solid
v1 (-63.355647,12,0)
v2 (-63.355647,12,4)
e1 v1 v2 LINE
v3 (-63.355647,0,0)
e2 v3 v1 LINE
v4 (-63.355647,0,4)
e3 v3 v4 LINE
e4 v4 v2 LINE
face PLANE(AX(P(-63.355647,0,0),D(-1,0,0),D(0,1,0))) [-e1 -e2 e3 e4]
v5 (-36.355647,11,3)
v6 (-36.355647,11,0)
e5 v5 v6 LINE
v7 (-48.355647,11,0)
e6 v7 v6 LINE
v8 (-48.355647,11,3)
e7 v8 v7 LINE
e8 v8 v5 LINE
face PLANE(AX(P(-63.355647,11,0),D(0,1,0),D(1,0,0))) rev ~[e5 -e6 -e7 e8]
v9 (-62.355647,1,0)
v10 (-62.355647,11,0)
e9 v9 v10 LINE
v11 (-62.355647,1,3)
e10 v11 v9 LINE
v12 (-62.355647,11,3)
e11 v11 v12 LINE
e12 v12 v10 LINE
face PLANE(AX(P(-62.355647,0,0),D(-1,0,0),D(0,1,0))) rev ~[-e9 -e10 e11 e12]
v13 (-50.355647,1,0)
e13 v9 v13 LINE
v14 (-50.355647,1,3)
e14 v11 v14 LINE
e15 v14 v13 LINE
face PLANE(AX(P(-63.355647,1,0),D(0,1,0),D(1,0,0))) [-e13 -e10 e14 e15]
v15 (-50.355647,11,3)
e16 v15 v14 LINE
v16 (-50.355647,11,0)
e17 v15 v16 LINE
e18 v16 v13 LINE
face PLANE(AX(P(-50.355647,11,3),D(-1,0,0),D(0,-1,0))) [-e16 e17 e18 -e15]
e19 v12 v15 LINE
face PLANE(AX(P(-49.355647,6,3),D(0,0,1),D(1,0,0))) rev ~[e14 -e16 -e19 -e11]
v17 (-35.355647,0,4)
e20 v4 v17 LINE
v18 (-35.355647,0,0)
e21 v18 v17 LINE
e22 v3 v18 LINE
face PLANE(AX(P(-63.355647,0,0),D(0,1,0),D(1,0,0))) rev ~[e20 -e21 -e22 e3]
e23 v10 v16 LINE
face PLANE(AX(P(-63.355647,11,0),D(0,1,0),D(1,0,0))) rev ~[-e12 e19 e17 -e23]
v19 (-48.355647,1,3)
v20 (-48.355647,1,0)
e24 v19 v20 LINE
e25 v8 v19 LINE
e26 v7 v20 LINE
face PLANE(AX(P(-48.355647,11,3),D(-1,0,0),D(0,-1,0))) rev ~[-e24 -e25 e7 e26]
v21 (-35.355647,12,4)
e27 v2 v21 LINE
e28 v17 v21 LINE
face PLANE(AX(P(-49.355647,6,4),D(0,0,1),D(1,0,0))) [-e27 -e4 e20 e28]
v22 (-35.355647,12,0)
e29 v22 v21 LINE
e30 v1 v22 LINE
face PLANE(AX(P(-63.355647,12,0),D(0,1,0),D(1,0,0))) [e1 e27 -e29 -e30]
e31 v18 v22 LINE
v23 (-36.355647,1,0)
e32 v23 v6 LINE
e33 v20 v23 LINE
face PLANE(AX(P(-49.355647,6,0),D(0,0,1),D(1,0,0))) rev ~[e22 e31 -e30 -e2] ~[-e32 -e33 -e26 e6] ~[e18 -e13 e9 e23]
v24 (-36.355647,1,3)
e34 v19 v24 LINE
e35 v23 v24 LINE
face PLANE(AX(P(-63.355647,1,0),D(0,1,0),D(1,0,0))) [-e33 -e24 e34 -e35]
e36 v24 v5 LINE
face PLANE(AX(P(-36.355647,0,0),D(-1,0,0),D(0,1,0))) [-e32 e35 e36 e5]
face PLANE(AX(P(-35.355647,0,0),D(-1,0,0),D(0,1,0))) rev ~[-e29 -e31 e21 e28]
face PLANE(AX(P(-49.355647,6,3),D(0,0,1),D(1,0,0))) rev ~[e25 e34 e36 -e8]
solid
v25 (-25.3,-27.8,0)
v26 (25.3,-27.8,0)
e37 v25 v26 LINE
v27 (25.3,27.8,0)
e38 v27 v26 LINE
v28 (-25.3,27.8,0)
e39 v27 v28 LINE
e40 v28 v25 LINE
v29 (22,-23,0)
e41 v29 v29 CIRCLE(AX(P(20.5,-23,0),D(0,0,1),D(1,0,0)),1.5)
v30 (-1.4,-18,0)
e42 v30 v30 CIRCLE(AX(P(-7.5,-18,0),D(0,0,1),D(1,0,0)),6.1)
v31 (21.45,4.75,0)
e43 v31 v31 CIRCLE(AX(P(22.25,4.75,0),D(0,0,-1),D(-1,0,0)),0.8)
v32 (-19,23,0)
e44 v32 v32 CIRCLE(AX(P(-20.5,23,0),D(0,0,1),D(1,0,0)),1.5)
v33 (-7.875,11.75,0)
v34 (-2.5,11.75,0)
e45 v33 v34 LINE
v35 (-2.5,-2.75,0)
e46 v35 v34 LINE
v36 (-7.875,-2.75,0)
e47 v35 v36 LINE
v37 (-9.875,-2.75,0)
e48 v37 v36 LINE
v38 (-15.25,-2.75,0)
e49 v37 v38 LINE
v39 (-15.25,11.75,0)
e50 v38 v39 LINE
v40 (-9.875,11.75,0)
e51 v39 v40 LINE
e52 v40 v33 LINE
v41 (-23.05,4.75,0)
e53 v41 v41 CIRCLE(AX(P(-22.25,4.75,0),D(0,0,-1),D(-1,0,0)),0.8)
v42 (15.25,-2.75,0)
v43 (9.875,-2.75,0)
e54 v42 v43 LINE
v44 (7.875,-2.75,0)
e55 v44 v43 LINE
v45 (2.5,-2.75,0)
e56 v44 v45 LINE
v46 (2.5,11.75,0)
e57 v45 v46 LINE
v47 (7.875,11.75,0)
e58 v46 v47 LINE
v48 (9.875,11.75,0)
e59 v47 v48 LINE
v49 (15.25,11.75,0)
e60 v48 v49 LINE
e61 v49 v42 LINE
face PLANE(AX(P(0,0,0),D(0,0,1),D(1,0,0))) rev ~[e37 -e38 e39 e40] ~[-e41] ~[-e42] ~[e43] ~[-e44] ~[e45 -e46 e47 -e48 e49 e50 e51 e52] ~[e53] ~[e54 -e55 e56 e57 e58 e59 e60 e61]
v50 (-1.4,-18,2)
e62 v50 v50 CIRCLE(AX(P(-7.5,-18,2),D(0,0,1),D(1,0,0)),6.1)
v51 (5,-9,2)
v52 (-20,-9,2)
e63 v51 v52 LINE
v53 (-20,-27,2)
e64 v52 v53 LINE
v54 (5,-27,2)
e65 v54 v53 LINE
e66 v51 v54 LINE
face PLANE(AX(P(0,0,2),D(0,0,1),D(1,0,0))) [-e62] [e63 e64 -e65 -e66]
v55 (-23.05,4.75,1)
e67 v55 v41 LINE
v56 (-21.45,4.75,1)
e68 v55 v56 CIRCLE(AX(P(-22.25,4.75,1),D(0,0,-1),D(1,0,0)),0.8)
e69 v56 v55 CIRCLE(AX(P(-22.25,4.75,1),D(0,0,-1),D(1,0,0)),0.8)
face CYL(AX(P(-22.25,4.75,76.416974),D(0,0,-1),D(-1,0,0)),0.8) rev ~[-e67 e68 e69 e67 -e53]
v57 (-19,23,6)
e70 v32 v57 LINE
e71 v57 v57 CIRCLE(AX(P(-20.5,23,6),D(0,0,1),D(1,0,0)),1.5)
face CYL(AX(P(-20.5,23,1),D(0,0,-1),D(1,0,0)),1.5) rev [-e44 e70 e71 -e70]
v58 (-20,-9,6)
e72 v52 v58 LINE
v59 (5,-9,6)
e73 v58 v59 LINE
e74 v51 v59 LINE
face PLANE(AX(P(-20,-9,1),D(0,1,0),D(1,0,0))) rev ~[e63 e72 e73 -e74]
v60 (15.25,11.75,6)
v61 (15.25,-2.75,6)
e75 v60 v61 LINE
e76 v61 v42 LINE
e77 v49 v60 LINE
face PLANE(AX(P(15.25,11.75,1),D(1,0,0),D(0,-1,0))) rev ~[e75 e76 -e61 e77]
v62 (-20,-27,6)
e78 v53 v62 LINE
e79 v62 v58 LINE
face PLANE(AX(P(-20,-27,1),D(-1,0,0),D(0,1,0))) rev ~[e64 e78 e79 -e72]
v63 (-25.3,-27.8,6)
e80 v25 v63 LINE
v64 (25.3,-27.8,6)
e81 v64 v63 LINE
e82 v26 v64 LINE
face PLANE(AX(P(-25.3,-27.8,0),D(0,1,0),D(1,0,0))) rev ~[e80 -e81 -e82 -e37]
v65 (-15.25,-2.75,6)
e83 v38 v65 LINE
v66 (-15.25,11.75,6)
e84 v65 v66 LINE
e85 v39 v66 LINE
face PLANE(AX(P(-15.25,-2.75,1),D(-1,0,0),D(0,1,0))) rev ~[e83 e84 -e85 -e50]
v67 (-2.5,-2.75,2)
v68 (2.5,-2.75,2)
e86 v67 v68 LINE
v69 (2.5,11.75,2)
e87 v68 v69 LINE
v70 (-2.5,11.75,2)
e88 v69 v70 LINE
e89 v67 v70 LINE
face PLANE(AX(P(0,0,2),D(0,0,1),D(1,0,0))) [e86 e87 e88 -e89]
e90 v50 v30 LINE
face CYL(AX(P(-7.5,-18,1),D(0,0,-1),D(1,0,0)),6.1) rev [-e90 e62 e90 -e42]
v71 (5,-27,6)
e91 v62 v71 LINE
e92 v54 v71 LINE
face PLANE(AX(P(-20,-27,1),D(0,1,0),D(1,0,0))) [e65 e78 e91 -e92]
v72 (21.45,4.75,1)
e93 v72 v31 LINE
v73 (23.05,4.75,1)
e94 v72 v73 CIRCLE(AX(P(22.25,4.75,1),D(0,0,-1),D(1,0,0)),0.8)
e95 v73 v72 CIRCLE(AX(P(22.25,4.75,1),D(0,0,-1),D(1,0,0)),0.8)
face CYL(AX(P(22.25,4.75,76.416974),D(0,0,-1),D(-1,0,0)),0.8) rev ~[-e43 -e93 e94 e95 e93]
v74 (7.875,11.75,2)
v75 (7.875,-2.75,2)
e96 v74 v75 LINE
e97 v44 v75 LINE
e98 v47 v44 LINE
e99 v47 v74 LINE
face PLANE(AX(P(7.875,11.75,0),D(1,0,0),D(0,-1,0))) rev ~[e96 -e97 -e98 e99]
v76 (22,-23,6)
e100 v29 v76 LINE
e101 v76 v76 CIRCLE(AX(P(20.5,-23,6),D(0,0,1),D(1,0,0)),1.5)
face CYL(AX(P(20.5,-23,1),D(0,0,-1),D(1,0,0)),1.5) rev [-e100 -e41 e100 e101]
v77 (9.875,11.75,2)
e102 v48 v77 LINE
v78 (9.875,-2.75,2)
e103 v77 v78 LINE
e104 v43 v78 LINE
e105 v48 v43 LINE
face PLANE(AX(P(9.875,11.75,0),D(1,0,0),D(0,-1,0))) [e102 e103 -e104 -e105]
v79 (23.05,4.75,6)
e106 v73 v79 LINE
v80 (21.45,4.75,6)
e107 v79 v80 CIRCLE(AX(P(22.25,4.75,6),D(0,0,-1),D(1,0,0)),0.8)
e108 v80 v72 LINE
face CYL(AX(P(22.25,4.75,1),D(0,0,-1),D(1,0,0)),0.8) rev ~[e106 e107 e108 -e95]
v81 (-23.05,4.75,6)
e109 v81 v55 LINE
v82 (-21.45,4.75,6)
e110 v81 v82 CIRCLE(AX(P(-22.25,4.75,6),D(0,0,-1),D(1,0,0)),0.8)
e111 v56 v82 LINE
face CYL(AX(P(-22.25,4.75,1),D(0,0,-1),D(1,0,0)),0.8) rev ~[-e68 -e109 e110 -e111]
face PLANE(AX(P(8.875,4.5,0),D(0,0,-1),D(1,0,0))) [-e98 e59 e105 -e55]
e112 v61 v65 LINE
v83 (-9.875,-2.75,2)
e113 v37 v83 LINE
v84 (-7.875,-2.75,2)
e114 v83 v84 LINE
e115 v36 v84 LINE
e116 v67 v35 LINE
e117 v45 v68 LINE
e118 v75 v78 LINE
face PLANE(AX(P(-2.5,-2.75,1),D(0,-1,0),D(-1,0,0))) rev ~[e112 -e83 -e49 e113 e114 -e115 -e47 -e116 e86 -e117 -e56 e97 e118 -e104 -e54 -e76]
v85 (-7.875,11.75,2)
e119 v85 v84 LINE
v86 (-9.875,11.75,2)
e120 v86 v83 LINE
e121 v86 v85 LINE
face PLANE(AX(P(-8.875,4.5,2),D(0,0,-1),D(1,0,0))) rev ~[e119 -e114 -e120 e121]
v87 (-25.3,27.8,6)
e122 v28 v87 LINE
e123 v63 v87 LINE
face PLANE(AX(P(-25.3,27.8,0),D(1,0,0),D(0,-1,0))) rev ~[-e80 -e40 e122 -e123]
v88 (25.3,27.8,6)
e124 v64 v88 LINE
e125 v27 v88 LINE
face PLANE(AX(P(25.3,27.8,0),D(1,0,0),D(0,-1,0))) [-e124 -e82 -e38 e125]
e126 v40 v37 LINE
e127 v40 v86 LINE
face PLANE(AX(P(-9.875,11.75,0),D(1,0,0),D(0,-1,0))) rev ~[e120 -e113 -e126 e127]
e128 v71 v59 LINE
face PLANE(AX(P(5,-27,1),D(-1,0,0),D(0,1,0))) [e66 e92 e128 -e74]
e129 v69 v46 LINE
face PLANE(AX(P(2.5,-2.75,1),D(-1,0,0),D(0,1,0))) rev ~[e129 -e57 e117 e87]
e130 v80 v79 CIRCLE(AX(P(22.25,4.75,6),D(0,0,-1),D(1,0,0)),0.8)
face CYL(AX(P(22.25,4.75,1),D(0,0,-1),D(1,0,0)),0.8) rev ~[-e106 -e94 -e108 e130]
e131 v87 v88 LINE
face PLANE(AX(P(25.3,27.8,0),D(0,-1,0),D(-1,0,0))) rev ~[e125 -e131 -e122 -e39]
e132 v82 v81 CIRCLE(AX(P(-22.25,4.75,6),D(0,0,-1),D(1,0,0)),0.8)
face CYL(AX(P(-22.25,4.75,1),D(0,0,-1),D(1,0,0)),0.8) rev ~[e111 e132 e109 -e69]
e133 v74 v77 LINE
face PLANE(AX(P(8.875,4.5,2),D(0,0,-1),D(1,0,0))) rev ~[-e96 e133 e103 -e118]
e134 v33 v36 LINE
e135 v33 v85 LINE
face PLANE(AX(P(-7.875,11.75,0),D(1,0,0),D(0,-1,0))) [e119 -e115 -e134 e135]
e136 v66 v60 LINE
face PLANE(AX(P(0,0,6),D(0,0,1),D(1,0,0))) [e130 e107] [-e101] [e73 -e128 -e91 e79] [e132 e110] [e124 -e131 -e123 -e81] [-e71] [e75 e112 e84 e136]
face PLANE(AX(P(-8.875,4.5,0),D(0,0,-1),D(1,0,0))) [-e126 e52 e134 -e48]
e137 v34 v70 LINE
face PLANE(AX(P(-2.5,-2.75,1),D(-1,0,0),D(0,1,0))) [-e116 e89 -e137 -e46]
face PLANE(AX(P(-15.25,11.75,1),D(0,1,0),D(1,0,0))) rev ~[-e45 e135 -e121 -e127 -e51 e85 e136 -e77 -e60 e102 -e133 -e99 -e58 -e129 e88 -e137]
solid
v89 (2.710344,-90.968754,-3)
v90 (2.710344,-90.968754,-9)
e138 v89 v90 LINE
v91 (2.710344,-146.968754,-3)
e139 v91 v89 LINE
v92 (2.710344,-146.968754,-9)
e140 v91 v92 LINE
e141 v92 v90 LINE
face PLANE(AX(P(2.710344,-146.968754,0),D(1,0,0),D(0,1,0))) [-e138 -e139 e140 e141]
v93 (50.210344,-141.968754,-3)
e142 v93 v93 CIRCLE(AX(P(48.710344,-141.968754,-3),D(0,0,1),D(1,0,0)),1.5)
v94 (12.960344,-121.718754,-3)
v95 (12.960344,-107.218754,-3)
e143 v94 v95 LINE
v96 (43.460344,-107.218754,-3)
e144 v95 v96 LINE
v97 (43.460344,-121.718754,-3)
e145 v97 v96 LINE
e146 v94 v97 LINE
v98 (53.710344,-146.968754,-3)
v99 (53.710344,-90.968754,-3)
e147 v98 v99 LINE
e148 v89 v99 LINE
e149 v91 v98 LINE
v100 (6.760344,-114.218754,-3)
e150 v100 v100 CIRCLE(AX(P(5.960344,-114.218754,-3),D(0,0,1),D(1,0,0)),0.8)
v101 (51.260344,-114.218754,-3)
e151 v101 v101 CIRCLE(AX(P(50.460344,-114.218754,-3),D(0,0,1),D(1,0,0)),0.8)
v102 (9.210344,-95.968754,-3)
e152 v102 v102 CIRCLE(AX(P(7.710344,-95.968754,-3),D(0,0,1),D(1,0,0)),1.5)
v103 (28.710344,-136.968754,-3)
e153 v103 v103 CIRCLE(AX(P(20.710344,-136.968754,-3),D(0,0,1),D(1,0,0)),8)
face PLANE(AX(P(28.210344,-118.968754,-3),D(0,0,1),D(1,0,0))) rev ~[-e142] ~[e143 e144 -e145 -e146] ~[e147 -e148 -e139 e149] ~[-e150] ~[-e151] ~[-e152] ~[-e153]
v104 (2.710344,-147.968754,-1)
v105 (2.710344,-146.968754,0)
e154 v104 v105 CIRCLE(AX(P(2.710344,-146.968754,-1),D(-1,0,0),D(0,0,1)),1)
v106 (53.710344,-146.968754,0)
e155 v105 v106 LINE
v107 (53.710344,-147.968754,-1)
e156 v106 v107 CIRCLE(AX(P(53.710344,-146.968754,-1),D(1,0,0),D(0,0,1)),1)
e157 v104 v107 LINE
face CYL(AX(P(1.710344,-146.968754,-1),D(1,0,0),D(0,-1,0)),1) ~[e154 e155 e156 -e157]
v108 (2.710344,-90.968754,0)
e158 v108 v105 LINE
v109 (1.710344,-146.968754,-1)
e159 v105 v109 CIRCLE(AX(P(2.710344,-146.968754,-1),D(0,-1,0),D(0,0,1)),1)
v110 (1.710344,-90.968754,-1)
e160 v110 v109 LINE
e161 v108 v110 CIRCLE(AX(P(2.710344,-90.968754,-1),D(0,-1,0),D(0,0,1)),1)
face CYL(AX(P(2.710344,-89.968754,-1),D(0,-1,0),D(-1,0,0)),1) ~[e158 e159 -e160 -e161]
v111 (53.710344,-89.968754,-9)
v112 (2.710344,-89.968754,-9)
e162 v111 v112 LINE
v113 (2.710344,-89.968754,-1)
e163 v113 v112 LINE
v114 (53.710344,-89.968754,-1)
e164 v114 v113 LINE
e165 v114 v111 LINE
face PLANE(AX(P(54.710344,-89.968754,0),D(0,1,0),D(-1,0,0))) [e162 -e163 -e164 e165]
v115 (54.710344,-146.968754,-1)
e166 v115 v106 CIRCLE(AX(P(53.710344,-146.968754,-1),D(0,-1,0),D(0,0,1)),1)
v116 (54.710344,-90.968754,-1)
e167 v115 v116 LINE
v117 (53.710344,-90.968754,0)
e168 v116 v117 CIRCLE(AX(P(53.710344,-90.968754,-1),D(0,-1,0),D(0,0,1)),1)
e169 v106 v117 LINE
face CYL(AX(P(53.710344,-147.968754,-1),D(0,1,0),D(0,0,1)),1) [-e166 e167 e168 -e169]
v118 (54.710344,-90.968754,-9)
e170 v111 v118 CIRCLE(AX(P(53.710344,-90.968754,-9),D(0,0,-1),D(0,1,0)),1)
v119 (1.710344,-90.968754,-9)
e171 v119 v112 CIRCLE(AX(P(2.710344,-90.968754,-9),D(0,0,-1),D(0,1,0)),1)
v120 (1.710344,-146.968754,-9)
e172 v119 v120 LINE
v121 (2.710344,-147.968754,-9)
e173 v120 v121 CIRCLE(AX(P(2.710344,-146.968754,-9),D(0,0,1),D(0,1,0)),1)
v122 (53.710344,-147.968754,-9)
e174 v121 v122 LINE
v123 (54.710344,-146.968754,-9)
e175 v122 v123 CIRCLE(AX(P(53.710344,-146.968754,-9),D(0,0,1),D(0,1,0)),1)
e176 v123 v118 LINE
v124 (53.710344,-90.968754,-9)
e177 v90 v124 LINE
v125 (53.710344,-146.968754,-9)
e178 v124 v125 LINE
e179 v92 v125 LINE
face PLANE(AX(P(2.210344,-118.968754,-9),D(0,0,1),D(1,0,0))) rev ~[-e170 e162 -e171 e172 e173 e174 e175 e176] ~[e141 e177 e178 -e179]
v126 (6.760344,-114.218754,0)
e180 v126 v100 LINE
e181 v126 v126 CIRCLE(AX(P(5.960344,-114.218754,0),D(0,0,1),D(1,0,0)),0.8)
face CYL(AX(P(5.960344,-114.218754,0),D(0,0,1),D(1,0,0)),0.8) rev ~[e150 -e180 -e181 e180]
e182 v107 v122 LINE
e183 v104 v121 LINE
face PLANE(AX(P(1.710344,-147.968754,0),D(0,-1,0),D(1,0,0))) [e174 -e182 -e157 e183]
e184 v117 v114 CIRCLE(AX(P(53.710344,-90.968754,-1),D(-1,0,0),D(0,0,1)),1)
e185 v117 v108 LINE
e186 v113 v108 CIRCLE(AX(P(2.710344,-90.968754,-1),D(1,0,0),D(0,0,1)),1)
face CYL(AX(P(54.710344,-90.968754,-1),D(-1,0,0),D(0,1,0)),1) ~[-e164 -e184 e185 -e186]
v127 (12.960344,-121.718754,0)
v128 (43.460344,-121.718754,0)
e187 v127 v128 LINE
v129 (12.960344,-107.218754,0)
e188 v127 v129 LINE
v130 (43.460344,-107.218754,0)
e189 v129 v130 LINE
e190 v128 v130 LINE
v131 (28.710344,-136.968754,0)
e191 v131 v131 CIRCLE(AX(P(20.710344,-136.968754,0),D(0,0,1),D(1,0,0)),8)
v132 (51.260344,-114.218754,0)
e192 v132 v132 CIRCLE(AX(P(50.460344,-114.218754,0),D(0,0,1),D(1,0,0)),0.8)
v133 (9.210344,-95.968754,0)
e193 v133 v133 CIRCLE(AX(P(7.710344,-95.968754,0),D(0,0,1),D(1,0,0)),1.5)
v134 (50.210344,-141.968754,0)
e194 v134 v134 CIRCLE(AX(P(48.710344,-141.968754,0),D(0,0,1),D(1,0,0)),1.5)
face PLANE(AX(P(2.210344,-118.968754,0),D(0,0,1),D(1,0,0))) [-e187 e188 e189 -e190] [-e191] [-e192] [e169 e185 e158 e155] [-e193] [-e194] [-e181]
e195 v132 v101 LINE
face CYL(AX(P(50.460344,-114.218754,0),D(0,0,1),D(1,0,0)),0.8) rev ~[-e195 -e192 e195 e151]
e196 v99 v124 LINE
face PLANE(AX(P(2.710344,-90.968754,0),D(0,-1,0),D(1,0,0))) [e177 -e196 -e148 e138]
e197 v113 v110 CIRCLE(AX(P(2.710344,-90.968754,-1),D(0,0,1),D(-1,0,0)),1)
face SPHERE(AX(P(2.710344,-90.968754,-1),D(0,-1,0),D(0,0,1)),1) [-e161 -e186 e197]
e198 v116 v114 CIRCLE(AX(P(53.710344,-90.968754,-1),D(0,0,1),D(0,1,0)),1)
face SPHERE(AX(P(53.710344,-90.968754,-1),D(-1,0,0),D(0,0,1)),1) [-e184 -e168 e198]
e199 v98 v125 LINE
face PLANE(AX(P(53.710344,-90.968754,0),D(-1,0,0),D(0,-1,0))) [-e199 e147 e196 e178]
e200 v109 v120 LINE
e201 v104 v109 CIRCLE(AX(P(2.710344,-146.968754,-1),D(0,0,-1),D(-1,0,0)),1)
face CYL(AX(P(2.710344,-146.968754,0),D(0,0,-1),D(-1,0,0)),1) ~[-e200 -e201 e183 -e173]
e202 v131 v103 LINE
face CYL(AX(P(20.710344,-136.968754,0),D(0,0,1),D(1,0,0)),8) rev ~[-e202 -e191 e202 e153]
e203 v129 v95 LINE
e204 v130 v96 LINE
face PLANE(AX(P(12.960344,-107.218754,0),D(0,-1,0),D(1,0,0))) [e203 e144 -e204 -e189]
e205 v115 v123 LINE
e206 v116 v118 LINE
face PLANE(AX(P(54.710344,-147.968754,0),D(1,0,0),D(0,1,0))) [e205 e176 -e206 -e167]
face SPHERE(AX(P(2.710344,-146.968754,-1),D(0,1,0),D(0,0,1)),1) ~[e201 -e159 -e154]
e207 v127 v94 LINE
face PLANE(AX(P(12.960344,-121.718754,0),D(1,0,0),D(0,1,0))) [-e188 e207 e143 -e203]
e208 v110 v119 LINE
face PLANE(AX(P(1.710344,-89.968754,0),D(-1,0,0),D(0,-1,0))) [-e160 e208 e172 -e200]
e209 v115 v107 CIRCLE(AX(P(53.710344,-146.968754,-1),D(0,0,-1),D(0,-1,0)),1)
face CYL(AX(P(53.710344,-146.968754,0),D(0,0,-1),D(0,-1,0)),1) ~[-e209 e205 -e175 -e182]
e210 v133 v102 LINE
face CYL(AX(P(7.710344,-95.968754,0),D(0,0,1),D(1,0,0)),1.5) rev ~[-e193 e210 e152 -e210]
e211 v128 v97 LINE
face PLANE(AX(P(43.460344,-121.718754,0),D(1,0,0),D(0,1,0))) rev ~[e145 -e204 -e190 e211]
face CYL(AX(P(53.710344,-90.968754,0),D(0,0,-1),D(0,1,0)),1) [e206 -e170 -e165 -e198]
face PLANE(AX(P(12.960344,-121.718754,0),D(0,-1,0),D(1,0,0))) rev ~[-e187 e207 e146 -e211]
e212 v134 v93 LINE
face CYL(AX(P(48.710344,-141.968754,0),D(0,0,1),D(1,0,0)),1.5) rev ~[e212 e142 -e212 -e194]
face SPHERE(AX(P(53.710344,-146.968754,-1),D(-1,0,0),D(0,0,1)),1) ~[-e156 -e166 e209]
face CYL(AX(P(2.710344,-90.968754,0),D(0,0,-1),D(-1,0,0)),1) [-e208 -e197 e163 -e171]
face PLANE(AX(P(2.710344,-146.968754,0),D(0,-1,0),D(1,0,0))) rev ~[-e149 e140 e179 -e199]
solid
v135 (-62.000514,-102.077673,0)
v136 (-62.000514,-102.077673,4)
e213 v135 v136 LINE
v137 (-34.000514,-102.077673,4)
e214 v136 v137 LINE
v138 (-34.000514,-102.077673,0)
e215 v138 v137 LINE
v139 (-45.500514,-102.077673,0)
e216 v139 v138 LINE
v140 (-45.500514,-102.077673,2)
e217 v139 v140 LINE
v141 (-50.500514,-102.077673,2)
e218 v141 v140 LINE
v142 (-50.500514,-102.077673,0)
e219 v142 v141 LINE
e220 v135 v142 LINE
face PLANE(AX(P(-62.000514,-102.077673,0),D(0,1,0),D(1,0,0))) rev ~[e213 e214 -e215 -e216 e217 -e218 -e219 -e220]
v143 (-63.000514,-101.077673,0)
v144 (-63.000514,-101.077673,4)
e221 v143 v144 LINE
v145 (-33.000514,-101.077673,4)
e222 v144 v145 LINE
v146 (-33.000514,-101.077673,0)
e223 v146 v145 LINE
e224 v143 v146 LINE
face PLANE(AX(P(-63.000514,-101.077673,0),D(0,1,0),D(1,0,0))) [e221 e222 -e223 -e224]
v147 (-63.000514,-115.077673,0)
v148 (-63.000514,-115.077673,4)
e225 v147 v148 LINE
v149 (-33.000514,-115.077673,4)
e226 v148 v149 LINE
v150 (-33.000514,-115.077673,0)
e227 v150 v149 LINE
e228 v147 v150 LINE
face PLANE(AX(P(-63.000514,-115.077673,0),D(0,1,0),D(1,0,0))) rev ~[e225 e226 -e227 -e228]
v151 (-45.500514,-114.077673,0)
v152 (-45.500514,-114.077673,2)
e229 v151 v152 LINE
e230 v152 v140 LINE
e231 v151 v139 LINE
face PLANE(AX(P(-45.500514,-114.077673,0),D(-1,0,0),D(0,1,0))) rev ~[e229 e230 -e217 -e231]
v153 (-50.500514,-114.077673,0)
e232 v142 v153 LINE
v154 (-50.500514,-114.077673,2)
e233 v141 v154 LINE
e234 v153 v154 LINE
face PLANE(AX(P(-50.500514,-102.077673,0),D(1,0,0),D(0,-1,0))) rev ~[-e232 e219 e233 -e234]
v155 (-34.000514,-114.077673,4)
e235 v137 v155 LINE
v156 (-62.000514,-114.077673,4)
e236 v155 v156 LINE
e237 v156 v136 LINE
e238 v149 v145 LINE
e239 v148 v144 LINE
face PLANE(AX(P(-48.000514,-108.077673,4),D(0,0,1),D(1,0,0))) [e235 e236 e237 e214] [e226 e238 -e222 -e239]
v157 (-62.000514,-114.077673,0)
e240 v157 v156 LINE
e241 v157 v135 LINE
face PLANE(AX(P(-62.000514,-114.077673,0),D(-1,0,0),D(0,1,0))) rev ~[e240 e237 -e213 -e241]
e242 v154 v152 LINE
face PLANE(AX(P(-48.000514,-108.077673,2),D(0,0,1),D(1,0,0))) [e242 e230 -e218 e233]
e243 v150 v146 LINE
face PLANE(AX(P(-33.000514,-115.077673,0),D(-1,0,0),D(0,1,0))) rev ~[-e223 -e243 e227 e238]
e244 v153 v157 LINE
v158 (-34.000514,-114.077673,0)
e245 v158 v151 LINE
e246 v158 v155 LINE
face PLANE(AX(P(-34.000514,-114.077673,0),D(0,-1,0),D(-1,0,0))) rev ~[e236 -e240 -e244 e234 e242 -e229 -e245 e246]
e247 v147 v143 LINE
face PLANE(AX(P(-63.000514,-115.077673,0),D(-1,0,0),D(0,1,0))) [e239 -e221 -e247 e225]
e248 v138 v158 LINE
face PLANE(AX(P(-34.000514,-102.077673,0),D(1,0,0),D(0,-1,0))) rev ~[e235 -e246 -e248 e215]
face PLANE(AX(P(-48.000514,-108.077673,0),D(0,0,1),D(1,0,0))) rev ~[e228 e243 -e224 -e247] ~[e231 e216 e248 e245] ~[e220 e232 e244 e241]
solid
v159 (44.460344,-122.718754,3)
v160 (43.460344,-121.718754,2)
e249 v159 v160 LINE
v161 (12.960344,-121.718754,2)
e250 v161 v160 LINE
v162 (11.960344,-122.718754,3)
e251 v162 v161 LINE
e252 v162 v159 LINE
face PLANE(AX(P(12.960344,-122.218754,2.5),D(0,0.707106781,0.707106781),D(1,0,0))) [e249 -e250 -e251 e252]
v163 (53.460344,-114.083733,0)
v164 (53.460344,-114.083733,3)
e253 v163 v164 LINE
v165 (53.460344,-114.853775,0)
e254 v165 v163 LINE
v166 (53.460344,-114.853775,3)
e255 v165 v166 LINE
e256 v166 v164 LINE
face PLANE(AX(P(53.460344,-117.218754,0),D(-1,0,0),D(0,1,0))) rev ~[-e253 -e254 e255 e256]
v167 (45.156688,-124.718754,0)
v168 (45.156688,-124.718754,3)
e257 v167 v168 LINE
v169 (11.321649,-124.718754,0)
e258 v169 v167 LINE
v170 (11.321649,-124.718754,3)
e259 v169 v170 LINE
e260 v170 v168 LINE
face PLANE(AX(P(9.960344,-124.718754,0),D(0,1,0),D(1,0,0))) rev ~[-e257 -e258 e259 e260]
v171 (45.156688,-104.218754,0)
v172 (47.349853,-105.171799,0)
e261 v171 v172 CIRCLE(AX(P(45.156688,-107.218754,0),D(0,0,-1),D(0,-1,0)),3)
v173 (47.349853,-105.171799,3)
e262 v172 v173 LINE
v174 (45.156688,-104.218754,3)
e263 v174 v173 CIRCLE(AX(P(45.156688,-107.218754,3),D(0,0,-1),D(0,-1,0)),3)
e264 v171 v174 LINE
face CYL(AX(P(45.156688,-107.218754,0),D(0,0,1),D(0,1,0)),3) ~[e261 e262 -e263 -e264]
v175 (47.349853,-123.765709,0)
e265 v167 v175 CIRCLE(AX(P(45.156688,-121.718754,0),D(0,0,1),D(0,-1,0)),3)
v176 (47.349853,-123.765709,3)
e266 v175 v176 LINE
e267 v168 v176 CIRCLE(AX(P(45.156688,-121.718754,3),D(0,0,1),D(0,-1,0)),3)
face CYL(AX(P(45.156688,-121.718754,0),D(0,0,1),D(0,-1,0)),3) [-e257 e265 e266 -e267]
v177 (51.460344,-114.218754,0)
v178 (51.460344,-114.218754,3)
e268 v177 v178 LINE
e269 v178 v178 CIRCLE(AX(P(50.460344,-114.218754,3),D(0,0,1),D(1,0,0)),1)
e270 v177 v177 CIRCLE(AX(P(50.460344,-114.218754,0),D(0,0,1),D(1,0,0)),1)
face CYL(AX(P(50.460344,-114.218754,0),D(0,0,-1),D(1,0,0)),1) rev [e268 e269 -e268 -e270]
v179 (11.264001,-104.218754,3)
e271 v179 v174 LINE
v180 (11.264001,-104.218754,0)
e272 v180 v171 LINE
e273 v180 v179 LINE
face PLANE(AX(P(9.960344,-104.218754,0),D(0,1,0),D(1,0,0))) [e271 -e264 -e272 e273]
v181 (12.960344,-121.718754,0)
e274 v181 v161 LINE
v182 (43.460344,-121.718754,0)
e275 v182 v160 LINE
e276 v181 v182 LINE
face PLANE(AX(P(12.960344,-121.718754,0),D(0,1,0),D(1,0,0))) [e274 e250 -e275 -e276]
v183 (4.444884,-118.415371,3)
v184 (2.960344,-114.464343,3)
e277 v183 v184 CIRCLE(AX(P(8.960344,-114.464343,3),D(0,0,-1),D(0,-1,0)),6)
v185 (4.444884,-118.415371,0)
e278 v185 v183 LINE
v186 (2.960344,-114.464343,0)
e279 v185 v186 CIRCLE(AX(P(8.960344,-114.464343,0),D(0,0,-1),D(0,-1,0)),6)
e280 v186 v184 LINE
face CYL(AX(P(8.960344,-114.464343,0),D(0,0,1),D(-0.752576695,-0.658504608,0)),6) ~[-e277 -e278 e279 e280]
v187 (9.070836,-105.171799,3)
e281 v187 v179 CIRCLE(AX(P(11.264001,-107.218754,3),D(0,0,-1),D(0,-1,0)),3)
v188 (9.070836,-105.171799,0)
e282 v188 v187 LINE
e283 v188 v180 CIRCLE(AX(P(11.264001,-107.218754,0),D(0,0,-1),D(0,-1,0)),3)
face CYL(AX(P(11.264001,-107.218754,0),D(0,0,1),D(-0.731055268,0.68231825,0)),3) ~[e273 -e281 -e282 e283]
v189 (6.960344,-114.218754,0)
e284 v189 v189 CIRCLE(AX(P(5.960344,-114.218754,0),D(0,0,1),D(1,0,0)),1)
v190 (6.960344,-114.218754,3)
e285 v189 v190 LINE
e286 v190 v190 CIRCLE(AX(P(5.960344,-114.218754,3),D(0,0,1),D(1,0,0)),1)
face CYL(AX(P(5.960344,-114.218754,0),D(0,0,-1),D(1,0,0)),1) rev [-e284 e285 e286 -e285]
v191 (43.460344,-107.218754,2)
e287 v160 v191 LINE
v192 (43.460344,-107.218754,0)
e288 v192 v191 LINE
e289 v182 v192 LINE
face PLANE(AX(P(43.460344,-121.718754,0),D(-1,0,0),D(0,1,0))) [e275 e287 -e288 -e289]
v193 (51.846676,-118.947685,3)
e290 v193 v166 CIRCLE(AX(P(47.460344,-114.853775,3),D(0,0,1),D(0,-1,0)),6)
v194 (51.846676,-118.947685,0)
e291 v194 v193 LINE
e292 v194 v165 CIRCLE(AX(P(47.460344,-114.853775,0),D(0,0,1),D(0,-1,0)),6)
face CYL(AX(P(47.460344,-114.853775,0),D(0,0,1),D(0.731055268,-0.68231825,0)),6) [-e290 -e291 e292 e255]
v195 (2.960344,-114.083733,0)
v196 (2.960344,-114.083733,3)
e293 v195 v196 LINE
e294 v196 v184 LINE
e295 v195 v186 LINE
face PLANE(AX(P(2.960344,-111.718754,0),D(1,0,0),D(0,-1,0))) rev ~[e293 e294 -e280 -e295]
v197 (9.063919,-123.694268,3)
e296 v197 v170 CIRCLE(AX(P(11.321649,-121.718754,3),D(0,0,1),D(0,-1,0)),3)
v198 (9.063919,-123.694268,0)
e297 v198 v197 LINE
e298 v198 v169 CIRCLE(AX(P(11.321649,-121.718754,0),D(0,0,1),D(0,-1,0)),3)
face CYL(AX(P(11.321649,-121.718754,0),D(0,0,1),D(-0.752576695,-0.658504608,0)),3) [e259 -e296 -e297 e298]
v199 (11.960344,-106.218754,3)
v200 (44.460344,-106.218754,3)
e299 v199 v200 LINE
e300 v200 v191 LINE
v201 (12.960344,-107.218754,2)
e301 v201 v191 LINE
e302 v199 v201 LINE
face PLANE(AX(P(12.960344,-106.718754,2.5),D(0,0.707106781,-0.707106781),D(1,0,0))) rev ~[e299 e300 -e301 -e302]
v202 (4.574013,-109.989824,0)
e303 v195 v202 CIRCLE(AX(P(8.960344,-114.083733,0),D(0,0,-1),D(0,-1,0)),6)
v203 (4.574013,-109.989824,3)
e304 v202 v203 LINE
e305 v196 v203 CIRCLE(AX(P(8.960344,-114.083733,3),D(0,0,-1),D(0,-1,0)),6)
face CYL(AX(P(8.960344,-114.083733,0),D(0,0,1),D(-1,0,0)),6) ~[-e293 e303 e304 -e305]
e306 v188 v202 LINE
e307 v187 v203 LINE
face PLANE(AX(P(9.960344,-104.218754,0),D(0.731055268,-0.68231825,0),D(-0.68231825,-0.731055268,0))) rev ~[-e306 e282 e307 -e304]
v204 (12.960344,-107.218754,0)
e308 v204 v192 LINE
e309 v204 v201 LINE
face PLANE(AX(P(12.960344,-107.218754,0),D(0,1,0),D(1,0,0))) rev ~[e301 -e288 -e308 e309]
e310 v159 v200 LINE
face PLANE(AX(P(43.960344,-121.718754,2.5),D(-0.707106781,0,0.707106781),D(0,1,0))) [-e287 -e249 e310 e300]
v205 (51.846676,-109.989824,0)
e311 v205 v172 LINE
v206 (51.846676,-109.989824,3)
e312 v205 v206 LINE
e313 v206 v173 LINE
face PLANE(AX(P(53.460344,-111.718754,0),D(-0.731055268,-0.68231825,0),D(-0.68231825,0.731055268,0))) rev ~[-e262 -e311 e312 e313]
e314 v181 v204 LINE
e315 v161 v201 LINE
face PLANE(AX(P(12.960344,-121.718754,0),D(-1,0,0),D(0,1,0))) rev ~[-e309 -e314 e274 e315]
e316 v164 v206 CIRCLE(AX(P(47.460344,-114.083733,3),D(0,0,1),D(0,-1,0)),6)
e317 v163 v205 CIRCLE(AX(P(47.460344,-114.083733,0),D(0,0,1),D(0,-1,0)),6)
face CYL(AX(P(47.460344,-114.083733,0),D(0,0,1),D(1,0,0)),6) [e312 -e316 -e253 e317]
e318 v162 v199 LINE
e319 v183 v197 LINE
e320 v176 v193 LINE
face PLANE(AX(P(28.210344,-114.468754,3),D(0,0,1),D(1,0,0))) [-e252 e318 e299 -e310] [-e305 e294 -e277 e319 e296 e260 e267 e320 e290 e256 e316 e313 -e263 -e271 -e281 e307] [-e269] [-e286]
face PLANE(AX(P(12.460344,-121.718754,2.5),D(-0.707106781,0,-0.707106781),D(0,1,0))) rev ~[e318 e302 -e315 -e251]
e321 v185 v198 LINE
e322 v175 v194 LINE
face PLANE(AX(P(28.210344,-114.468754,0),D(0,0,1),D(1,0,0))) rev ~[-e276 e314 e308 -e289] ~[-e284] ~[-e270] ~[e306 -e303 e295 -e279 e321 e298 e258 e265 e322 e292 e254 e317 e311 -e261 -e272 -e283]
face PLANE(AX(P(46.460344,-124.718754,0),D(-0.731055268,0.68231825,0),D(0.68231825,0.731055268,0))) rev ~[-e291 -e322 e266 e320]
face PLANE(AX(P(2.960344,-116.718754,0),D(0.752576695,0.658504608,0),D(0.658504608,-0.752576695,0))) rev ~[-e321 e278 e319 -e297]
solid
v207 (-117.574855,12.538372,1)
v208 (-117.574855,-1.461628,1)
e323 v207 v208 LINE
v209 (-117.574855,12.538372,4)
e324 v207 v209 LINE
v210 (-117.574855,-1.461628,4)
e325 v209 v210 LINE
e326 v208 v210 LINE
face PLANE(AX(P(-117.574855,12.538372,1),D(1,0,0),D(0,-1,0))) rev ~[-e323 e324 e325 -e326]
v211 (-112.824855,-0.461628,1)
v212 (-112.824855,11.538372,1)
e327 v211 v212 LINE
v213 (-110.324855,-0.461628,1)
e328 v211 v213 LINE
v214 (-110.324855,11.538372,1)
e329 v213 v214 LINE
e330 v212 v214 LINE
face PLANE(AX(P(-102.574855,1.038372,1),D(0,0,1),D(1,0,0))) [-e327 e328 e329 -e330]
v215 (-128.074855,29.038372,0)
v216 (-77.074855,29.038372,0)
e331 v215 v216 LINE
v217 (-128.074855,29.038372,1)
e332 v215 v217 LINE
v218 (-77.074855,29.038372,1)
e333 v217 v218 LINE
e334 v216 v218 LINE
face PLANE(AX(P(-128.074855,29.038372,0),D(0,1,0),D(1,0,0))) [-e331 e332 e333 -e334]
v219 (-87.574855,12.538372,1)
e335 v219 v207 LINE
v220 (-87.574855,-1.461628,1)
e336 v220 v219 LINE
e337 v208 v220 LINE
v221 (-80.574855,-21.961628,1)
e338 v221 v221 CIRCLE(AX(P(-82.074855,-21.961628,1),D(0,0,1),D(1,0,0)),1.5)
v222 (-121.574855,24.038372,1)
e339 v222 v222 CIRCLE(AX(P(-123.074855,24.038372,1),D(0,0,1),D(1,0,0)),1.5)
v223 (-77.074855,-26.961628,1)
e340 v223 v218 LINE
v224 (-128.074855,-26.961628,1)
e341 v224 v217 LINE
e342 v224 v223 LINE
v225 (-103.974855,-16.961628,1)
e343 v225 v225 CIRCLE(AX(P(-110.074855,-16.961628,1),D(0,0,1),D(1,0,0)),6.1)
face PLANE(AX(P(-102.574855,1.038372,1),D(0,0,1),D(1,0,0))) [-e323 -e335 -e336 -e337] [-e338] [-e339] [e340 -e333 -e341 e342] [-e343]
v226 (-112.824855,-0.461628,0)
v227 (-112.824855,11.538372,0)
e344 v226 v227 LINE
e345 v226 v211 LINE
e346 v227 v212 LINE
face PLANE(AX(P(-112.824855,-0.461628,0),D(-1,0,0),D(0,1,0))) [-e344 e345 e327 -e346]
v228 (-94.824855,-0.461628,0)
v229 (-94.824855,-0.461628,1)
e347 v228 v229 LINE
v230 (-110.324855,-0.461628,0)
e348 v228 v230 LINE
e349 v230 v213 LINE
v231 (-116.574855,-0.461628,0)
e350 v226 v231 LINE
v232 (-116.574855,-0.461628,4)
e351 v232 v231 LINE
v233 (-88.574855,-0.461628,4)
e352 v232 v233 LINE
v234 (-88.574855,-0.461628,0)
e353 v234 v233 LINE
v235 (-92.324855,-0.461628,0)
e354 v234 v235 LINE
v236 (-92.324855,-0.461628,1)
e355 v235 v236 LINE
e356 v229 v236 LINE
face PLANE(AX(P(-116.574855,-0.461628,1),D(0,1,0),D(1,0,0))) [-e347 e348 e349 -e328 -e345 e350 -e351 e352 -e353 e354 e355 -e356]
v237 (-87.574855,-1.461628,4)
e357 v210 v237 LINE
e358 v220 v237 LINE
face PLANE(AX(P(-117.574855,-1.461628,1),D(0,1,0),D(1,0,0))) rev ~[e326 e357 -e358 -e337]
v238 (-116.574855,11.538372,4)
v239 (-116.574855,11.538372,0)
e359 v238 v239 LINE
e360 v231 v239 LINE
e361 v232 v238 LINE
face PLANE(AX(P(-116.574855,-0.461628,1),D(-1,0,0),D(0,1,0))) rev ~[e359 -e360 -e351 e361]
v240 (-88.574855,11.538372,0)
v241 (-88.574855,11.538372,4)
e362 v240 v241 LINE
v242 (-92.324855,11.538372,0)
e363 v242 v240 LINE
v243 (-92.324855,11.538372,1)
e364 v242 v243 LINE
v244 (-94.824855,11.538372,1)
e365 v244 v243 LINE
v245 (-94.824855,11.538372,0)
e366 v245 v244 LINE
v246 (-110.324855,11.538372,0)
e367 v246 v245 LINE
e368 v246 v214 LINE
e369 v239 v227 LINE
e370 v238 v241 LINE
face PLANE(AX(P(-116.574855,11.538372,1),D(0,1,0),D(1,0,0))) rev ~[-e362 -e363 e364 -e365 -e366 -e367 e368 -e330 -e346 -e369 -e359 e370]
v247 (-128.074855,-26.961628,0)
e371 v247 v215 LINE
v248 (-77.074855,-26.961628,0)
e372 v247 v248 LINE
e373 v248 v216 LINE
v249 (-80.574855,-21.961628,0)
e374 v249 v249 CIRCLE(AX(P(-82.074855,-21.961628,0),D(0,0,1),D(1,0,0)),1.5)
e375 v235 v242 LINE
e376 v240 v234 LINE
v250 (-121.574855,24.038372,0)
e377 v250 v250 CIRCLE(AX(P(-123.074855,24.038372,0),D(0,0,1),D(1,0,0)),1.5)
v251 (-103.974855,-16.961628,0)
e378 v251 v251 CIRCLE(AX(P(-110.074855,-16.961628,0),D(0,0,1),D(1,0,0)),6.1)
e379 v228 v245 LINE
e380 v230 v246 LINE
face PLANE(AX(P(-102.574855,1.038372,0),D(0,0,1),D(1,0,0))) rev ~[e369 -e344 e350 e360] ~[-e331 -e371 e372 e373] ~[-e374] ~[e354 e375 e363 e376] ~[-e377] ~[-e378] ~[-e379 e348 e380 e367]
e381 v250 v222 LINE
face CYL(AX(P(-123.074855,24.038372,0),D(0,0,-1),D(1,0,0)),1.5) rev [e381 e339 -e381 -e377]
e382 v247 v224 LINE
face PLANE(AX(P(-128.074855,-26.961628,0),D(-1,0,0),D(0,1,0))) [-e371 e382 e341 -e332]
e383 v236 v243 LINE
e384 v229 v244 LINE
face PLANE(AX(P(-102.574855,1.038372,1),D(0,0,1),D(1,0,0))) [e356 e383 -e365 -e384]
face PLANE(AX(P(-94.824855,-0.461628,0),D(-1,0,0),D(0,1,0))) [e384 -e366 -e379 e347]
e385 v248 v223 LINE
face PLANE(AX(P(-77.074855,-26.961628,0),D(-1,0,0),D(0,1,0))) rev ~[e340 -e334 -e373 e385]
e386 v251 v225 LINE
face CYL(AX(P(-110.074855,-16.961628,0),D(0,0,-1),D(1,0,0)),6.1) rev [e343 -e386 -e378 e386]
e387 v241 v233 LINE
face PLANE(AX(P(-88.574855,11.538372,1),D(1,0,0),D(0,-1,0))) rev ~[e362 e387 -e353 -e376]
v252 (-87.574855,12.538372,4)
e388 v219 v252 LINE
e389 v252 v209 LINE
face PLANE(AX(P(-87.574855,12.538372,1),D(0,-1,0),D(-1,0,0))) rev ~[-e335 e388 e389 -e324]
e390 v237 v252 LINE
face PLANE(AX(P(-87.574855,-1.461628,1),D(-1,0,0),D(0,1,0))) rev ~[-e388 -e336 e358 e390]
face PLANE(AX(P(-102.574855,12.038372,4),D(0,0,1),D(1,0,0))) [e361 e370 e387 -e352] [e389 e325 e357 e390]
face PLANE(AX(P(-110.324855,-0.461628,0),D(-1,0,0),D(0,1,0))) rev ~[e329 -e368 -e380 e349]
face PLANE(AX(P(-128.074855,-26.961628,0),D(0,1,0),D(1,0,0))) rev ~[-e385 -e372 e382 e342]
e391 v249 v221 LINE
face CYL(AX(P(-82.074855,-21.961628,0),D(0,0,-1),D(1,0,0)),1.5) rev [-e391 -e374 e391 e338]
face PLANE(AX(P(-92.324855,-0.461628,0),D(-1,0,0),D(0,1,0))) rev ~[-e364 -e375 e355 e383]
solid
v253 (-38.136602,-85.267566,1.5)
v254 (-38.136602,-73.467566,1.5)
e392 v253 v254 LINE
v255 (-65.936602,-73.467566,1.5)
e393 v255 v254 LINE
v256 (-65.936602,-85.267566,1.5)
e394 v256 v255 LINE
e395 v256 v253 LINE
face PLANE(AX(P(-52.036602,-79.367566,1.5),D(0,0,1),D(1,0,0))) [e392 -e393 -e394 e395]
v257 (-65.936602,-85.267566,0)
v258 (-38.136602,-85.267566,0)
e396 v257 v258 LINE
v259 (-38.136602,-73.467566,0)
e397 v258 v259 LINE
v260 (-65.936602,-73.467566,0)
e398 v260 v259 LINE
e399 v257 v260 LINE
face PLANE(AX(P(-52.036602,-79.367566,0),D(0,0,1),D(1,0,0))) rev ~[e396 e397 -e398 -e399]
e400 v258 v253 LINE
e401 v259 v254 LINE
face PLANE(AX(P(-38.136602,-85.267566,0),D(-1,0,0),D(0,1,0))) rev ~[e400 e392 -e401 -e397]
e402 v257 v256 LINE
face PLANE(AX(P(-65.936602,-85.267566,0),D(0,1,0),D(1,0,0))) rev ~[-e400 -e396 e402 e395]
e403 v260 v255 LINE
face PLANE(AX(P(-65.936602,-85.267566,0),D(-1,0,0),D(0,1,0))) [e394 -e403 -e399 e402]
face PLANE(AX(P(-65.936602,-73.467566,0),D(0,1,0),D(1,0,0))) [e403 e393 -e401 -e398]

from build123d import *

# Parameters (mm, degrees)
F0_W      = 51
F0_H      = 56
F0_R      = 1.5
F0_R_2    = 6.1
F0_W_2    = 5
F0_H_2    = 14.5
F1_DEPTH  = 1
F0_W_3    = 2.5
F0_H_3    = 12
F3_W      = 28
F3_H      = 1
F4_DEPTH  = 3
F5_W      = 28
F5_H      = 12
F6_DEPTH  = 4
F7_T      = -1
F8_W      = 2
F8_H      = 10
F9_DEPTH  = 3
F2_W      = 30
F2_H      = 14
F11_DEPTH = 4
F2_W_2    = 51
F2_H_2    = 56
F2_R      = 8
F2_R_2    = 1.5
F2_R_3    = 0.8
F2_W_3    = 30.5
F2_H_3    = 14.5
F12_DEPTH = 3
F2_W_4    = 5
F2_H_4    = 2
F2_H_5    = 5
F13_DEPTH = 2
F5_W_2    = 27.8
F5_H_2    = 11.8
F14_DEPTH = 1.5
F2_H_6    = 1
F15_DEPTH = 9
F16_W     = 36.5
F16_H     = 20.5
F16_W_2   = 30.5
F16_H_2   = 14.5
F16_R     = 1
F17_DEPTH = 3
F18_R     = 6
F19_R     = 3
F20_R     = 1
F21_SIZE  = 1
F24_DEPTH = 1
F25_D     = 1.4
F25_DEPTH = 1.001
F27_D     = 1.4
F22_W     = 51
F22_H     = 56
F22_W_2   = 25
F22_H_2   = 18
F22_R     = 1.5
F28_DEPTH = 5
F29_W     = 0.2
F29_H     = 55.6
F30_DEPTH = 25
F31_D     = 1.6
F31_DEPTH = 5.001
F32_D     = 1.6
F33_W     = 2
F33_H     = 14.5
F34_DEPTH = 2


# Not quite as in the source:
# - a feature names something its author has since deleted; it is built from what else it names


with BuildPart() as f1:
    # F0 (on Top) → F1 (new body)
    with BuildSketch(Plane.XY):
        Rectangle(F0_W, F0_H)
        with Locations((20.5, -23)):
            Circle(F0_R, mode=Mode.SUBTRACT)
        with Locations((-7.5, -18)):
            Circle(F0_R_2, mode=Mode.SUBTRACT)
        Polygon((-15.25, -2.75), (-15.25, 11.75), (-2.5, 11.75), (2.5, 11.75), (15.25, 11.75), (15.25, -2.75), (2.5, -2.75), (-2.5, -2.75), align=None, mode=Mode.SUBTRACT)
        with Locations((-20.5, 23)):
            Circle(F0_R, mode=Mode.SUBTRACT)
        with Locations((0, 4.5)):
            Rectangle(F0_W_2, F0_H_2)
    extrude(amount=F1_DEPTH)

    # F24 (add): a face of the model
    f24_faces = [f1.faces().sort_by_distance(p)[0] for p in [
        (0.3722548806, 0.1869472989, 1),
    ]]
    extrude(f24_faces, amount=F24_DEPTH)

    # F25 (through all, one way)
    with BuildSketch(Plane.XY.offset(1)):
        with Locations((-22.25, 4.75), (22.25, 4.75)):
            Circle(F25_D / 2)
    extrude(amount=-F25_DEPTH, mode=Mode.SUBTRACT)

    # F27 (through all)
    with Locations(Plane(origin=(0, 0, 1), x_dir=(1, 0, 0), z_dir=(0, 0, -1))):
        with Locations((-22.25, -4.75), (22.25, -4.75)):
            Hole(F27_D / 2)

    # F22 (on face) → F28 (join)
    with BuildSketch(Plane.XY.offset(1)):
        Rectangle(F22_W, F22_H)
        with Locations((-7.5, -18)):
            Rectangle(F22_W_2, F22_H_2, mode=Mode.SUBTRACT)
        with Locations((20.5, -23)):
            Circle(F22_R, mode=Mode.SUBTRACT)
        with Locations((-20.5, 23)):
            Circle(F22_R, mode=Mode.SUBTRACT)
        Polygon((-15.25, -2.75), (-15.25, 11.75), (-2.5, 11.75), (2.5, 11.75), (15.25, 11.75), (15.25, -2.75), (2.5, -2.75), (-2.5, -2.75), align=None, mode=Mode.SUBTRACT)
    extrude(amount=F28_DEPTH)

    # F29 (on face) → F30 (cut)
    with BuildSketch(Plane(origin=(0, 0, 0), x_dir=(1, 0, 0), z_dir=(0, 0, -1))):
        Polygon((25.5, 28), (-25.5, 28), (-25.5, 27.8), (-25.3, 27.8), (25.3, 27.8), (25.5, 27.8), align=None)
        with Locations((-25.4, 0)):
            Rectangle(F29_W, F29_H)
        with Locations((25.4, 0)):
            Rectangle(F29_W, F29_H)
        Polygon((-25.3, -27.8), (-25.5, -27.8), (-25.5, -28), (25.5, -28), (25.5, -27.8), (25.3, -27.8), align=None)
    extrude(amount=-F30_DEPTH, mode=Mode.SUBTRACT)

    # F31 (through all, one way)
    with BuildSketch(Plane(origin=(0, 0, 1), x_dir=(1, 0, 0), z_dir=(0, 0, -1))):
        with Locations((-22.25, -4.75), (22.25, -4.75)):
            Circle(F31_D / 2)
    extrude(amount=-F31_DEPTH, mode=Mode.SUBTRACT)

    # F32 (through all)
    with Locations(Plane.XY.offset(1)):
        with Locations((22.25, 4.75), (-22.25, 4.75)):
            Hole(F32_D / 2)

    # F33 (on face) → F34 (join)
    with BuildSketch(Plane(origin=(0, 0, 0), x_dir=(1, 0, 0), z_dir=(0, 0, -1))):
        with Locations((-8.875, -4.5)):
            Rectangle(F33_W, F33_H)
        with Locations((8.875, -4.5)):
            Rectangle(F33_W, F33_H)
    extrude(amount=-F34_DEPTH)


with BuildPart() as f1b:
    # F0 (on Top) → F1, piece 2 (new body)
    with BuildSketch(Plane.XY):
        with Locations((-102.5748546124, 1.0383715183)):
            Rectangle(F0_W, F0_H)
        with Locations((-110.0748546124, -16.9616284817)):
            Circle(F0_R_2, mode=Mode.SUBTRACT)
        with Locations((-82.0748546124, -21.9616284817)):
            Circle(F0_R, mode=Mode.SUBTRACT)
        Polygon((-116.5748546124, -0.4616284817), (-116.5748546124, 11.5383715183), (-112.8248546124, 11.5383715183), (-110.3248546124, 11.5383715183), (-94.8248546124, 11.5383715183), (-92.3248546124, 11.5383715183), (-88.5748546124, 11.5383715183), (-88.5748546124, -0.4616284817), (-92.3248546124, -0.4616284817), (-94.8248546124, -0.4616284817), (-110.3248546124, -0.4616284817), (-112.8248546124, -0.4616284817), align=None, mode=Mode.SUBTRACT)
        with Locations((-123.0748546124, 24.0383715183)):
            Circle(F0_R, mode=Mode.SUBTRACT)
        with Locations((-111.5748546124, 5.5383715183)):
            Rectangle(F0_W_3, F0_H_3)
        with Locations((-93.5748546124, 5.5383715183)):
            Rectangle(F0_W_3, F0_H_3)
    extrude(amount=F1_DEPTH)

    # F3 (on face) → F4 (join)
    with BuildSketch(Plane.XY.offset(1)):
        with Locations((-102.5748546124, 12.0383715183)):
            Rectangle(F3_W, F3_H)
        Polygon((-116.5748546124, -0.4616284817), (-116.5748546124, 11.5383715183), (-116.5748546124, 12.5383715183), (-117.5748546124, 12.5383715183), (-117.5748546124, -1.4616284817), (-116.5748546124, -1.4616284817), align=None)
        Polygon((-88.5748546124, 12.5383715183), (-88.5748546124, 11.5383715183), (-88.5748546124, -0.4616284817), (-88.5748546124, -1.4616284817), (-87.5748546124, -1.4616284817), (-87.5748546124, 12.5383715183), align=None)
        with Locations((-102.5748546124, -0.9616284817)):
            Rectangle(F3_W, F3_H)
    extrude(amount=F4_DEPTH)


with BuildPart() as f6:
    # F5 (on Top) → F6 (new body)
    with BuildSketch(Plane.XY):
        with Locations((-49.3556470275, 6)):
            Rectangle(F5_W, F5_H)
    extrude(amount=F6_DEPTH)

    # F7
    f7_openings = [f6.faces().sort_by_distance(p)[0] for p in [
        (-49.355647, 6, 0),
    ]]
    offset(amount=F7_T, openings=f7_openings)

    # F8 (on face) → F9 (join)
    with BuildSketch(Plane(origin=(0, 0, 3), x_dir=(1, 0, 0), z_dir=(0, 0, -1))):
        with Locations((-49.3556470275, -6)):
            Rectangle(F8_W, F8_H)
    extrude(amount=F9_DEPTH)


with BuildPart() as f11:
    # F2 (on Top) → F11 (new body)
    with BuildSketch(Plane.XY):
        with Locations((-48.0005137329, -108.0776734079)):
            Rectangle(F2_W, F2_H)
        Polygon((-62.0005137329, -114.0776734079), (-62.0005137329, -102.0776734079), (-50.5005137329, -102.0776734079), (-45.5005137329, -102.0776734079), (-34.0005137329, -102.0776734079), (-34.0005137329, -107.0776734079), (-34.0005137329, -109.0776734079), (-34.0005137329, -114.0776734079), (-45.5005137329, -114.0776734079), (-50.5005137329, -114.0776734079), align=None, mode=Mode.SUBTRACT)
    extrude(amount=F11_DEPTH)

    # F2 (on Top) → F13 (join)
    with BuildSketch(Plane.XY):
        with Locations((-48.0005137329, -108.0776734079)):
            Rectangle(F2_W_4, F2_H_4)
        with Locations((-48.0005137329, -104.5776734079)):
            Rectangle(F2_W_4, F2_H_5)
        with Locations((-48.0005137329, -111.5776734079)):
            Rectangle(F2_W_4, F2_H_5)
    extrude(amount=F13_DEPTH)


with BuildPart() as f12:
    # F2 (on Top) → F12 (new body)
    with BuildSketch(Plane.XY):
        with Locations((28.2103444552, -118.9687541723)):
            Rectangle(F2_W_2, F2_H_2)
        with Locations((20.7103444552, -136.9687541723)):
            Circle(F2_R, mode=Mode.SUBTRACT)
        with Locations((48.7103444552, -141.9687541723)):
            Circle(F2_R_2, mode=Mode.SUBTRACT)
        with Locations((5.9603444552, -114.2187541723)):
            Circle(F2_R_3, mode=Mode.SUBTRACT)
        with Locations((28.2103444552, -114.4687541723)):
            Rectangle(F2_W_3, F2_H_3, mode=Mode.SUBTRACT)
        with Locations((50.4603444552, -114.2187541723)):
            Circle(F2_R_3, mode=Mode.SUBTRACT)
        with Locations((7.7103444552, -95.9687541723)):
            Circle(F2_R_2, mode=Mode.SUBTRACT)
    extrude(amount=-F12_DEPTH)

    # F2 (on Top) → F15 (join)
    with BuildSketch(Plane.XY):
        Polygon((2.7103444552, -146.9687541723), (2.7103444552, -90.9687541723), (2.7103444552, -89.9687541723), (1.7103444552, -89.9687541723), (1.7103444552, -147.9687541723), (2.7103444552, -147.9687541723), align=None)
        with Locations((28.2103444552, -90.4687541723)):
            Rectangle(F2_W_2, F2_H_6)
        with Locations((28.2103444552, -147.4687541723)):
            Rectangle(F2_W_2, F2_H_6)
        Polygon((53.7103444552, -89.9687541723), (53.7103444552, -90.9687541723), (53.7103444552, -146.9687541723), (53.7103444552, -147.9687541723), (54.7103444552, -147.9687541723), (54.7103444552, -89.9687541723), align=None)
    extrude(amount=-F15_DEPTH)

    # F20
    f20_edges = [f12.edges().sort_by_distance(p)[0] for p in [
        (1.710344, -118.968754, 0),
        (28.210344, -89.968754, 0),
        (28.210344, -147.968754, 0),
        (54.710344, -118.968754, 0),
        (54.710344, -147.968754, -4.5),
        (1.710344, -147.968754, -4.5),
        (1.710344, -89.968754, -4.5),
        (54.710344, -89.968754, -4.5),
    ]]
    fillet(f20_edges, radius=F20_R)


with BuildPart() as f14:
    # F5 (on Top) → F14 (new body)
    with BuildSketch(Plane.XY):
        with Locations((-52.0366017878, -79.3675661445)):
            Rectangle(F5_W_2, F5_H_2)
    extrude(amount=F14_DEPTH)


with BuildPart() as f17:
    # F16 (on face) → F17 (new body)
    with BuildSketch(Plane.XY):
        with Locations((28.2103444552, -114.4687541723)):
            Rectangle(F16_W, F16_H)
        with Locations((28.2103444552, -114.4687541723)):
            Rectangle(F16_W_2, F16_H_2, mode=Mode.SUBTRACT)
        Polygon((9.9603444552, -124.7187541723), (9.9603444552, -104.2187541723), (2.9603444552, -111.7187541723), (2.9603444552, -116.7187541723), align=None)
        with Locations((5.9603444552, -114.2187541723)):
            Circle(F16_R, mode=Mode.SUBTRACT)
        Polygon((53.4603444552, -111.7187541723), (46.4603444552, -104.2187541723), (46.4603444552, -124.7187541723), (53.4603444552, -117.2187541723), align=None)
        with Locations((50.4603444552, -114.2187541723)):
            Circle(F16_R, mode=Mode.SUBTRACT)
    extrude(amount=F17_DEPTH)

    # F18
    f18_edges = [f17.edges().sort_by_distance(p)[0] for p in [
        (2.960344, -111.718754, 1.5),
        (2.960344, -116.718754, 1.5),
        (53.460344, -117.218754, 1.5),
        (53.460344, -111.718754, 1.5),
    ]]
    fillet(f18_edges, radius=F18_R)

    # F19
    f19_edges = [f17.edges().sort_by_distance(p)[0] for p in [
        (9.960344, -104.218754, 1.5),
        (9.960344, -124.718754, 1.5),
        (46.460344, -124.718754, 1.5),
        (46.460344, -104.218754, 1.5),
    ]]
    fillet(f19_edges, radius=F19_R)

    # F21
    f21_edges = [f17.edges().sort_by_distance(p)[0] for p in [
        (12.960344, -114.468754, 3),
        (28.210344, -107.218754, 3),
        (43.460344, -114.468754, 3),
        (28.210344, -121.718754, 3),
    ]]
    chamfer(f21_edges, length=F21_SIZE)


solid = Compound([f1.part, f1b.part, f6.part, f11.part, f12.part, f14.part, f17.part])
